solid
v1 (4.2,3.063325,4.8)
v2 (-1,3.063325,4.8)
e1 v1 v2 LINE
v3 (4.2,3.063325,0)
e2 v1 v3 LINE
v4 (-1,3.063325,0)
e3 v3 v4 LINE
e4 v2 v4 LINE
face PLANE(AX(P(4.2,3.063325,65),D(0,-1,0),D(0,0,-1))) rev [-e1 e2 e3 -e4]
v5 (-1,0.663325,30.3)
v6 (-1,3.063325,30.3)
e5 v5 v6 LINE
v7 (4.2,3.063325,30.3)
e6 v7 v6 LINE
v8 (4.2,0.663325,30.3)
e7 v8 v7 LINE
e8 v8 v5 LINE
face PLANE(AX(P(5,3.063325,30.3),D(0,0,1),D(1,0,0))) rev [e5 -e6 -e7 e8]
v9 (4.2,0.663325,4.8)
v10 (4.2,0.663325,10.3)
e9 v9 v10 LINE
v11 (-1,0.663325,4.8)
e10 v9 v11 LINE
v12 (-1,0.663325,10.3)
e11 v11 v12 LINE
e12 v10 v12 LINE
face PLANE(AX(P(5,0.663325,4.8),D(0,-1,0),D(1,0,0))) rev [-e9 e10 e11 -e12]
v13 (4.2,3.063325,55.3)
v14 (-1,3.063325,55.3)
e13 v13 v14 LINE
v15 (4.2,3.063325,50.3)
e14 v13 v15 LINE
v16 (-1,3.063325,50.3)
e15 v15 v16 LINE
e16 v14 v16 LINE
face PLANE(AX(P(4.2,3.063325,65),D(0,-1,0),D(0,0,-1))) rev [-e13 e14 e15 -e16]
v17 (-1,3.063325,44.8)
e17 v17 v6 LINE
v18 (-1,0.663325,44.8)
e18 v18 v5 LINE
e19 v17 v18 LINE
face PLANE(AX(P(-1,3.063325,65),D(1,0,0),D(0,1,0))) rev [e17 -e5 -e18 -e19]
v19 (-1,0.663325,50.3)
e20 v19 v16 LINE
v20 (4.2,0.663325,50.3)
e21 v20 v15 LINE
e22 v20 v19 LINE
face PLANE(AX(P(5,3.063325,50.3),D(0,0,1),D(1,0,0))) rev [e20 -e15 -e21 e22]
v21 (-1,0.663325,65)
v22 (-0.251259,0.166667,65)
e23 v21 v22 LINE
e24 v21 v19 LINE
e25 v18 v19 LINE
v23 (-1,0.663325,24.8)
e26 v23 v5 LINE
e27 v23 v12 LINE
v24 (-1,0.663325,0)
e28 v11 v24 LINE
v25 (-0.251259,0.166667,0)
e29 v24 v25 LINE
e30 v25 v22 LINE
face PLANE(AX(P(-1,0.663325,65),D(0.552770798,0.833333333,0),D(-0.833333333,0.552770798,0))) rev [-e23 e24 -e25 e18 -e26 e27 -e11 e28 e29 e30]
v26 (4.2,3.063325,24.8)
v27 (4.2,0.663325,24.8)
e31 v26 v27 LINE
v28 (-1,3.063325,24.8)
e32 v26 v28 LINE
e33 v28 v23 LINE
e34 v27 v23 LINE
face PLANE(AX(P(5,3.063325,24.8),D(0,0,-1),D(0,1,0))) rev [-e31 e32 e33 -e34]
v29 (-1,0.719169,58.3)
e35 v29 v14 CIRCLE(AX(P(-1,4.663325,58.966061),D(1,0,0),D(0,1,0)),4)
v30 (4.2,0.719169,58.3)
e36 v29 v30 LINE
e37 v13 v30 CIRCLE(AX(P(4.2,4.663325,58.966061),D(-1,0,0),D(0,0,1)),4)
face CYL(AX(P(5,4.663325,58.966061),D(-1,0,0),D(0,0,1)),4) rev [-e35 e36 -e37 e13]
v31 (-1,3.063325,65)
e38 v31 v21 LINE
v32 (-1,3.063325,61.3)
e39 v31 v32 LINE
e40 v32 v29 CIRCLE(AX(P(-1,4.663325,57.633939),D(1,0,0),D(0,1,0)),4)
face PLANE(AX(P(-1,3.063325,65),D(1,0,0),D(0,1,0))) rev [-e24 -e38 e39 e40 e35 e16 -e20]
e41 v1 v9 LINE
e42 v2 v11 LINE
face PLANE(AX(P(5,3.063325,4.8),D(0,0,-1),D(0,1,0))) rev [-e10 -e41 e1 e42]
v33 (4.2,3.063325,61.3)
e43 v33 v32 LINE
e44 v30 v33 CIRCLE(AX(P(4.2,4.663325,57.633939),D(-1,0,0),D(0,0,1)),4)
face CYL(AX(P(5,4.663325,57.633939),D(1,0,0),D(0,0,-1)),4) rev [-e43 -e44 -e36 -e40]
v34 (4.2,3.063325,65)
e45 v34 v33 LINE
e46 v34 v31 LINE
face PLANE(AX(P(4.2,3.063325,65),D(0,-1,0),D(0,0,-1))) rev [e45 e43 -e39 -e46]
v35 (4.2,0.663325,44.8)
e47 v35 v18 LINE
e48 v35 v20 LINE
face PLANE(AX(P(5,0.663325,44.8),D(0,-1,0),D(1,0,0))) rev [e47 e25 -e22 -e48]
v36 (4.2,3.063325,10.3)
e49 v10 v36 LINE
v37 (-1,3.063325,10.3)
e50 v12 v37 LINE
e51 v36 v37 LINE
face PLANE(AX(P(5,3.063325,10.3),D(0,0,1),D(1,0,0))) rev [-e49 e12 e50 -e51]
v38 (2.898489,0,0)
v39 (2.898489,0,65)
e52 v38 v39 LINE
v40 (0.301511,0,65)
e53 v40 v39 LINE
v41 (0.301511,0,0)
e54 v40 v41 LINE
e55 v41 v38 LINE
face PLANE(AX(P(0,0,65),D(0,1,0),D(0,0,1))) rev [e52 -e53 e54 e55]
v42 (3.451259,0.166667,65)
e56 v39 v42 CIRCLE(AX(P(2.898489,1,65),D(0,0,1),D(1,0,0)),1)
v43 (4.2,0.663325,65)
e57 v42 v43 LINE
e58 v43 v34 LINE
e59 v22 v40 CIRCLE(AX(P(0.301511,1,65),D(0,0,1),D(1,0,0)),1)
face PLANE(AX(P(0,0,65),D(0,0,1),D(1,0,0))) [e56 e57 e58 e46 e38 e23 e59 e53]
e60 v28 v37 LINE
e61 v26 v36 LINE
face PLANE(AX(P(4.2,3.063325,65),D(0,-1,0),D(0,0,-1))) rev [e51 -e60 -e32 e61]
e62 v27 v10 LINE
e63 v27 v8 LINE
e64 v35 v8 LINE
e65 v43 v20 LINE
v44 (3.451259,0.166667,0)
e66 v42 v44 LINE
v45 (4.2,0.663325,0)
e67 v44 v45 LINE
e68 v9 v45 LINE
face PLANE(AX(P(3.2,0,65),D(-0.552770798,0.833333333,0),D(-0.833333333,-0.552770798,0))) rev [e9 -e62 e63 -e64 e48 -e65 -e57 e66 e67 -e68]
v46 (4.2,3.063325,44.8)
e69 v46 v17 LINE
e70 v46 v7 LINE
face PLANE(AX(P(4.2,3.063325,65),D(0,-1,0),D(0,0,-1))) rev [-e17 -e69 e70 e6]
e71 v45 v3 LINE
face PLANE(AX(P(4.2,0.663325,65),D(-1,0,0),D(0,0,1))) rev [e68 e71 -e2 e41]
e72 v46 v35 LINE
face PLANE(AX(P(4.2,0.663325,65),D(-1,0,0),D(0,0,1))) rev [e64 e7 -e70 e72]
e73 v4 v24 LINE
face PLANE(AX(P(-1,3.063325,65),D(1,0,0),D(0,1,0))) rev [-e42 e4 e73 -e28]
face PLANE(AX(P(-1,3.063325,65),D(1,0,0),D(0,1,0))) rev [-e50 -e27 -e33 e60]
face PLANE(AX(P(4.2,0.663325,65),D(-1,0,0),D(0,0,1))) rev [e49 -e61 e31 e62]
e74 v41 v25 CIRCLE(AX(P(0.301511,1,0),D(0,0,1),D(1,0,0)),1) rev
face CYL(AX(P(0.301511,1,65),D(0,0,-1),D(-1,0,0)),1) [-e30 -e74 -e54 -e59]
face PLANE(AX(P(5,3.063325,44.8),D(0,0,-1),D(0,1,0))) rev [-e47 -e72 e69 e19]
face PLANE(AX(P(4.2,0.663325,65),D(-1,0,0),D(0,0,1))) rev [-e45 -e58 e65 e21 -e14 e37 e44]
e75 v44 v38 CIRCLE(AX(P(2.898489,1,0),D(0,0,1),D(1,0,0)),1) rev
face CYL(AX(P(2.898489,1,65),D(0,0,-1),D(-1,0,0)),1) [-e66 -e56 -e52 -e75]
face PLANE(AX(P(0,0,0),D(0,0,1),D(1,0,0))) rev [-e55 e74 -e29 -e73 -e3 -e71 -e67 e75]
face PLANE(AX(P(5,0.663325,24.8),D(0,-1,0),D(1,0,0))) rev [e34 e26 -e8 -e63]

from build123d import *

# Parameters (mm, degrees)
BOSS_EXTRUDE1_DEPTH = 65
SKETCH2_W           = 5.5
SKETCH2_H           = 2.4
CUT_EXTRUDE1_DEPTH  = 6
LPATTERN1_COUNT     = 3
LPATTERN1_PITCH     = 20
SKETCH3_W           = 6
SKETCH3_H           = 2.4
CUT_EXTRUDE2_DEPTH  = 6
FILLET1_R           = 4
FILLET2_R           = 4
FILLET3_R           = 1
FILLET4_R           = 1


with BuildPart() as part:
    # Sketch1 → Boss-Extrude1 (new body)
    with BuildSketch(Plane.XY):
        Polygon((0, 0), (3.2, 0), (4.2, 0.663324958), (4.2, 3.063324958), (-1, 3.063324958), (-1, 0.663324958), align=None)
    extrude(amount=BOSS_EXTRUDE1_DEPTH)

    # Sketch2 → Cut-Extrude1 (cut)
    with BuildSketch(Plane.ZY.offset(1)):
        with Locations((7.55, 1.863324958)):
            Rectangle(SKETCH2_W, SKETCH2_H)
    cut_extrude1 = extrude(amount=-CUT_EXTRUDE1_DEPTH, mode=Mode.SUBTRACT)

    # LPattern1: Cut-Extrude1 ×3
    with Locations(*[(0, 0, i * LPATTERN1_PITCH) for i in range(1, LPATTERN1_COUNT)]):
        add(cut_extrude1, mode=Mode.SUBTRACT)

    # Sketch3 → Cut-Extrude2 (cut)
    with BuildSketch(Plane.ZY.offset(1)):
        with Locations((58.3, 1.863324958)):
            Rectangle(SKETCH3_W, SKETCH3_H)
    extrude(amount=-CUT_EXTRUDE2_DEPTH, mode=Mode.SUBTRACT)

    # Fillet1
    # the kernel refuses this fillet: 4 mm, written as the material it adds along each edge
    with BuildSketch(Plane(origin=(-1, 0.663324958, 55.3), x_dir=(0, 0, 1), z_dir=(1, 0, 0))) as fillet1_piece_1_section:
        with BuildLine():
            CenterArc((3.666060556, -4), FILLET1_R, 90, 66.421821522)
            Line((0, -2.4), (-0.073321211, -2.368))
            ThreePointArc((-0.073321211, -2.368), (-0.08, -1.2), (-0.08, 0))
            Line((-0.08, 0), (0, 0.08))
            Line((0, 0.08), (3.666060556, 0.08))
            Line((3.666060556, 0.08), (3.666060556, 0))
        make_face()
    fillet1_piece_1 = extrude(amount=5.2, mode=Mode.PRIVATE)
    fillet1_piece_1 = split(fillet1_piece_1, bisect_by=Plane(origin=(0.518931728, -0.344220367, 56.190586237), z_dir=(0.5527707983925672, 0.833333333333333, 0)), keep=Keep.TOP, mode=Mode.PRIVATE)
    fillet1_piece_1 = split(fillet1_piece_1, bisect_by=Plane(origin=(2.681068272, -0.344220367, 56.190586237), z_dir=(-0.5527707983925666, 0.8333333333333335, 0)), keep=Keep.TOP, mode=Mode.PRIVATE)
    add(fillet1_piece_1)

    # Fillet2
    # the kernel refuses this fillet: 4 mm, written as the material it adds along each edge
    with BuildSketch(Plane(origin=(-1, 0.663324958, 61.3), x_dir=(0, 1, 0), z_dir=(1, 0, 0))) as fillet2_piece_1_section:
        with BuildLine():
            CenterArc((4, -3.666060556), FILLET2_R, 113.578178478, 66.421821522)
            Line((0, -3.666060556), (-0.08, -3.666060556))
            Line((-0.08, -3.666060556), (-0.08, 0))
            Line((-0.08, 0), (0, 0.08))
            ThreePointArc((0, 0.08), (1.2, 0.08), (2.368, 0.073321211))
            Line((2.368, 0.073321211), (2.4, 0))
        make_face()
    fillet2_piece_1 = extrude(amount=5.2, mode=Mode.PRIVATE)
    fillet2_piece_1 = split(fillet2_piece_1, bisect_by=Plane(origin=(2.681068272, -0.344220367, 60.409413763), z_dir=(-0.5527707983925666, 0.8333333333333335, 0)), keep=Keep.TOP, mode=Mode.PRIVATE)
    fillet2_piece_1 = split(fillet2_piece_1, bisect_by=Plane(origin=(0.518931728, -0.344220367, 60.409413763), z_dir=(0.5527707983925672, 0.833333333333333, 0)), keep=Keep.TOP, mode=Mode.PRIVATE)
    add(fillet2_piece_1)

    # Fillet3
    fillet3_edges = [part.edges().sort_by_distance(p)[0] for p in [
        (3.2, 0, 32.5),
    ]]
    fillet(fillet3_edges, radius=FILLET3_R)

    # Fillet4
    fillet4_edges = [part.edges().sort_by_distance(p)[0] for p in [
        (0, 0, 32.5),
    ]]
    fillet(fillet4_edges, radius=FILLET4_R)


solid = part.part
